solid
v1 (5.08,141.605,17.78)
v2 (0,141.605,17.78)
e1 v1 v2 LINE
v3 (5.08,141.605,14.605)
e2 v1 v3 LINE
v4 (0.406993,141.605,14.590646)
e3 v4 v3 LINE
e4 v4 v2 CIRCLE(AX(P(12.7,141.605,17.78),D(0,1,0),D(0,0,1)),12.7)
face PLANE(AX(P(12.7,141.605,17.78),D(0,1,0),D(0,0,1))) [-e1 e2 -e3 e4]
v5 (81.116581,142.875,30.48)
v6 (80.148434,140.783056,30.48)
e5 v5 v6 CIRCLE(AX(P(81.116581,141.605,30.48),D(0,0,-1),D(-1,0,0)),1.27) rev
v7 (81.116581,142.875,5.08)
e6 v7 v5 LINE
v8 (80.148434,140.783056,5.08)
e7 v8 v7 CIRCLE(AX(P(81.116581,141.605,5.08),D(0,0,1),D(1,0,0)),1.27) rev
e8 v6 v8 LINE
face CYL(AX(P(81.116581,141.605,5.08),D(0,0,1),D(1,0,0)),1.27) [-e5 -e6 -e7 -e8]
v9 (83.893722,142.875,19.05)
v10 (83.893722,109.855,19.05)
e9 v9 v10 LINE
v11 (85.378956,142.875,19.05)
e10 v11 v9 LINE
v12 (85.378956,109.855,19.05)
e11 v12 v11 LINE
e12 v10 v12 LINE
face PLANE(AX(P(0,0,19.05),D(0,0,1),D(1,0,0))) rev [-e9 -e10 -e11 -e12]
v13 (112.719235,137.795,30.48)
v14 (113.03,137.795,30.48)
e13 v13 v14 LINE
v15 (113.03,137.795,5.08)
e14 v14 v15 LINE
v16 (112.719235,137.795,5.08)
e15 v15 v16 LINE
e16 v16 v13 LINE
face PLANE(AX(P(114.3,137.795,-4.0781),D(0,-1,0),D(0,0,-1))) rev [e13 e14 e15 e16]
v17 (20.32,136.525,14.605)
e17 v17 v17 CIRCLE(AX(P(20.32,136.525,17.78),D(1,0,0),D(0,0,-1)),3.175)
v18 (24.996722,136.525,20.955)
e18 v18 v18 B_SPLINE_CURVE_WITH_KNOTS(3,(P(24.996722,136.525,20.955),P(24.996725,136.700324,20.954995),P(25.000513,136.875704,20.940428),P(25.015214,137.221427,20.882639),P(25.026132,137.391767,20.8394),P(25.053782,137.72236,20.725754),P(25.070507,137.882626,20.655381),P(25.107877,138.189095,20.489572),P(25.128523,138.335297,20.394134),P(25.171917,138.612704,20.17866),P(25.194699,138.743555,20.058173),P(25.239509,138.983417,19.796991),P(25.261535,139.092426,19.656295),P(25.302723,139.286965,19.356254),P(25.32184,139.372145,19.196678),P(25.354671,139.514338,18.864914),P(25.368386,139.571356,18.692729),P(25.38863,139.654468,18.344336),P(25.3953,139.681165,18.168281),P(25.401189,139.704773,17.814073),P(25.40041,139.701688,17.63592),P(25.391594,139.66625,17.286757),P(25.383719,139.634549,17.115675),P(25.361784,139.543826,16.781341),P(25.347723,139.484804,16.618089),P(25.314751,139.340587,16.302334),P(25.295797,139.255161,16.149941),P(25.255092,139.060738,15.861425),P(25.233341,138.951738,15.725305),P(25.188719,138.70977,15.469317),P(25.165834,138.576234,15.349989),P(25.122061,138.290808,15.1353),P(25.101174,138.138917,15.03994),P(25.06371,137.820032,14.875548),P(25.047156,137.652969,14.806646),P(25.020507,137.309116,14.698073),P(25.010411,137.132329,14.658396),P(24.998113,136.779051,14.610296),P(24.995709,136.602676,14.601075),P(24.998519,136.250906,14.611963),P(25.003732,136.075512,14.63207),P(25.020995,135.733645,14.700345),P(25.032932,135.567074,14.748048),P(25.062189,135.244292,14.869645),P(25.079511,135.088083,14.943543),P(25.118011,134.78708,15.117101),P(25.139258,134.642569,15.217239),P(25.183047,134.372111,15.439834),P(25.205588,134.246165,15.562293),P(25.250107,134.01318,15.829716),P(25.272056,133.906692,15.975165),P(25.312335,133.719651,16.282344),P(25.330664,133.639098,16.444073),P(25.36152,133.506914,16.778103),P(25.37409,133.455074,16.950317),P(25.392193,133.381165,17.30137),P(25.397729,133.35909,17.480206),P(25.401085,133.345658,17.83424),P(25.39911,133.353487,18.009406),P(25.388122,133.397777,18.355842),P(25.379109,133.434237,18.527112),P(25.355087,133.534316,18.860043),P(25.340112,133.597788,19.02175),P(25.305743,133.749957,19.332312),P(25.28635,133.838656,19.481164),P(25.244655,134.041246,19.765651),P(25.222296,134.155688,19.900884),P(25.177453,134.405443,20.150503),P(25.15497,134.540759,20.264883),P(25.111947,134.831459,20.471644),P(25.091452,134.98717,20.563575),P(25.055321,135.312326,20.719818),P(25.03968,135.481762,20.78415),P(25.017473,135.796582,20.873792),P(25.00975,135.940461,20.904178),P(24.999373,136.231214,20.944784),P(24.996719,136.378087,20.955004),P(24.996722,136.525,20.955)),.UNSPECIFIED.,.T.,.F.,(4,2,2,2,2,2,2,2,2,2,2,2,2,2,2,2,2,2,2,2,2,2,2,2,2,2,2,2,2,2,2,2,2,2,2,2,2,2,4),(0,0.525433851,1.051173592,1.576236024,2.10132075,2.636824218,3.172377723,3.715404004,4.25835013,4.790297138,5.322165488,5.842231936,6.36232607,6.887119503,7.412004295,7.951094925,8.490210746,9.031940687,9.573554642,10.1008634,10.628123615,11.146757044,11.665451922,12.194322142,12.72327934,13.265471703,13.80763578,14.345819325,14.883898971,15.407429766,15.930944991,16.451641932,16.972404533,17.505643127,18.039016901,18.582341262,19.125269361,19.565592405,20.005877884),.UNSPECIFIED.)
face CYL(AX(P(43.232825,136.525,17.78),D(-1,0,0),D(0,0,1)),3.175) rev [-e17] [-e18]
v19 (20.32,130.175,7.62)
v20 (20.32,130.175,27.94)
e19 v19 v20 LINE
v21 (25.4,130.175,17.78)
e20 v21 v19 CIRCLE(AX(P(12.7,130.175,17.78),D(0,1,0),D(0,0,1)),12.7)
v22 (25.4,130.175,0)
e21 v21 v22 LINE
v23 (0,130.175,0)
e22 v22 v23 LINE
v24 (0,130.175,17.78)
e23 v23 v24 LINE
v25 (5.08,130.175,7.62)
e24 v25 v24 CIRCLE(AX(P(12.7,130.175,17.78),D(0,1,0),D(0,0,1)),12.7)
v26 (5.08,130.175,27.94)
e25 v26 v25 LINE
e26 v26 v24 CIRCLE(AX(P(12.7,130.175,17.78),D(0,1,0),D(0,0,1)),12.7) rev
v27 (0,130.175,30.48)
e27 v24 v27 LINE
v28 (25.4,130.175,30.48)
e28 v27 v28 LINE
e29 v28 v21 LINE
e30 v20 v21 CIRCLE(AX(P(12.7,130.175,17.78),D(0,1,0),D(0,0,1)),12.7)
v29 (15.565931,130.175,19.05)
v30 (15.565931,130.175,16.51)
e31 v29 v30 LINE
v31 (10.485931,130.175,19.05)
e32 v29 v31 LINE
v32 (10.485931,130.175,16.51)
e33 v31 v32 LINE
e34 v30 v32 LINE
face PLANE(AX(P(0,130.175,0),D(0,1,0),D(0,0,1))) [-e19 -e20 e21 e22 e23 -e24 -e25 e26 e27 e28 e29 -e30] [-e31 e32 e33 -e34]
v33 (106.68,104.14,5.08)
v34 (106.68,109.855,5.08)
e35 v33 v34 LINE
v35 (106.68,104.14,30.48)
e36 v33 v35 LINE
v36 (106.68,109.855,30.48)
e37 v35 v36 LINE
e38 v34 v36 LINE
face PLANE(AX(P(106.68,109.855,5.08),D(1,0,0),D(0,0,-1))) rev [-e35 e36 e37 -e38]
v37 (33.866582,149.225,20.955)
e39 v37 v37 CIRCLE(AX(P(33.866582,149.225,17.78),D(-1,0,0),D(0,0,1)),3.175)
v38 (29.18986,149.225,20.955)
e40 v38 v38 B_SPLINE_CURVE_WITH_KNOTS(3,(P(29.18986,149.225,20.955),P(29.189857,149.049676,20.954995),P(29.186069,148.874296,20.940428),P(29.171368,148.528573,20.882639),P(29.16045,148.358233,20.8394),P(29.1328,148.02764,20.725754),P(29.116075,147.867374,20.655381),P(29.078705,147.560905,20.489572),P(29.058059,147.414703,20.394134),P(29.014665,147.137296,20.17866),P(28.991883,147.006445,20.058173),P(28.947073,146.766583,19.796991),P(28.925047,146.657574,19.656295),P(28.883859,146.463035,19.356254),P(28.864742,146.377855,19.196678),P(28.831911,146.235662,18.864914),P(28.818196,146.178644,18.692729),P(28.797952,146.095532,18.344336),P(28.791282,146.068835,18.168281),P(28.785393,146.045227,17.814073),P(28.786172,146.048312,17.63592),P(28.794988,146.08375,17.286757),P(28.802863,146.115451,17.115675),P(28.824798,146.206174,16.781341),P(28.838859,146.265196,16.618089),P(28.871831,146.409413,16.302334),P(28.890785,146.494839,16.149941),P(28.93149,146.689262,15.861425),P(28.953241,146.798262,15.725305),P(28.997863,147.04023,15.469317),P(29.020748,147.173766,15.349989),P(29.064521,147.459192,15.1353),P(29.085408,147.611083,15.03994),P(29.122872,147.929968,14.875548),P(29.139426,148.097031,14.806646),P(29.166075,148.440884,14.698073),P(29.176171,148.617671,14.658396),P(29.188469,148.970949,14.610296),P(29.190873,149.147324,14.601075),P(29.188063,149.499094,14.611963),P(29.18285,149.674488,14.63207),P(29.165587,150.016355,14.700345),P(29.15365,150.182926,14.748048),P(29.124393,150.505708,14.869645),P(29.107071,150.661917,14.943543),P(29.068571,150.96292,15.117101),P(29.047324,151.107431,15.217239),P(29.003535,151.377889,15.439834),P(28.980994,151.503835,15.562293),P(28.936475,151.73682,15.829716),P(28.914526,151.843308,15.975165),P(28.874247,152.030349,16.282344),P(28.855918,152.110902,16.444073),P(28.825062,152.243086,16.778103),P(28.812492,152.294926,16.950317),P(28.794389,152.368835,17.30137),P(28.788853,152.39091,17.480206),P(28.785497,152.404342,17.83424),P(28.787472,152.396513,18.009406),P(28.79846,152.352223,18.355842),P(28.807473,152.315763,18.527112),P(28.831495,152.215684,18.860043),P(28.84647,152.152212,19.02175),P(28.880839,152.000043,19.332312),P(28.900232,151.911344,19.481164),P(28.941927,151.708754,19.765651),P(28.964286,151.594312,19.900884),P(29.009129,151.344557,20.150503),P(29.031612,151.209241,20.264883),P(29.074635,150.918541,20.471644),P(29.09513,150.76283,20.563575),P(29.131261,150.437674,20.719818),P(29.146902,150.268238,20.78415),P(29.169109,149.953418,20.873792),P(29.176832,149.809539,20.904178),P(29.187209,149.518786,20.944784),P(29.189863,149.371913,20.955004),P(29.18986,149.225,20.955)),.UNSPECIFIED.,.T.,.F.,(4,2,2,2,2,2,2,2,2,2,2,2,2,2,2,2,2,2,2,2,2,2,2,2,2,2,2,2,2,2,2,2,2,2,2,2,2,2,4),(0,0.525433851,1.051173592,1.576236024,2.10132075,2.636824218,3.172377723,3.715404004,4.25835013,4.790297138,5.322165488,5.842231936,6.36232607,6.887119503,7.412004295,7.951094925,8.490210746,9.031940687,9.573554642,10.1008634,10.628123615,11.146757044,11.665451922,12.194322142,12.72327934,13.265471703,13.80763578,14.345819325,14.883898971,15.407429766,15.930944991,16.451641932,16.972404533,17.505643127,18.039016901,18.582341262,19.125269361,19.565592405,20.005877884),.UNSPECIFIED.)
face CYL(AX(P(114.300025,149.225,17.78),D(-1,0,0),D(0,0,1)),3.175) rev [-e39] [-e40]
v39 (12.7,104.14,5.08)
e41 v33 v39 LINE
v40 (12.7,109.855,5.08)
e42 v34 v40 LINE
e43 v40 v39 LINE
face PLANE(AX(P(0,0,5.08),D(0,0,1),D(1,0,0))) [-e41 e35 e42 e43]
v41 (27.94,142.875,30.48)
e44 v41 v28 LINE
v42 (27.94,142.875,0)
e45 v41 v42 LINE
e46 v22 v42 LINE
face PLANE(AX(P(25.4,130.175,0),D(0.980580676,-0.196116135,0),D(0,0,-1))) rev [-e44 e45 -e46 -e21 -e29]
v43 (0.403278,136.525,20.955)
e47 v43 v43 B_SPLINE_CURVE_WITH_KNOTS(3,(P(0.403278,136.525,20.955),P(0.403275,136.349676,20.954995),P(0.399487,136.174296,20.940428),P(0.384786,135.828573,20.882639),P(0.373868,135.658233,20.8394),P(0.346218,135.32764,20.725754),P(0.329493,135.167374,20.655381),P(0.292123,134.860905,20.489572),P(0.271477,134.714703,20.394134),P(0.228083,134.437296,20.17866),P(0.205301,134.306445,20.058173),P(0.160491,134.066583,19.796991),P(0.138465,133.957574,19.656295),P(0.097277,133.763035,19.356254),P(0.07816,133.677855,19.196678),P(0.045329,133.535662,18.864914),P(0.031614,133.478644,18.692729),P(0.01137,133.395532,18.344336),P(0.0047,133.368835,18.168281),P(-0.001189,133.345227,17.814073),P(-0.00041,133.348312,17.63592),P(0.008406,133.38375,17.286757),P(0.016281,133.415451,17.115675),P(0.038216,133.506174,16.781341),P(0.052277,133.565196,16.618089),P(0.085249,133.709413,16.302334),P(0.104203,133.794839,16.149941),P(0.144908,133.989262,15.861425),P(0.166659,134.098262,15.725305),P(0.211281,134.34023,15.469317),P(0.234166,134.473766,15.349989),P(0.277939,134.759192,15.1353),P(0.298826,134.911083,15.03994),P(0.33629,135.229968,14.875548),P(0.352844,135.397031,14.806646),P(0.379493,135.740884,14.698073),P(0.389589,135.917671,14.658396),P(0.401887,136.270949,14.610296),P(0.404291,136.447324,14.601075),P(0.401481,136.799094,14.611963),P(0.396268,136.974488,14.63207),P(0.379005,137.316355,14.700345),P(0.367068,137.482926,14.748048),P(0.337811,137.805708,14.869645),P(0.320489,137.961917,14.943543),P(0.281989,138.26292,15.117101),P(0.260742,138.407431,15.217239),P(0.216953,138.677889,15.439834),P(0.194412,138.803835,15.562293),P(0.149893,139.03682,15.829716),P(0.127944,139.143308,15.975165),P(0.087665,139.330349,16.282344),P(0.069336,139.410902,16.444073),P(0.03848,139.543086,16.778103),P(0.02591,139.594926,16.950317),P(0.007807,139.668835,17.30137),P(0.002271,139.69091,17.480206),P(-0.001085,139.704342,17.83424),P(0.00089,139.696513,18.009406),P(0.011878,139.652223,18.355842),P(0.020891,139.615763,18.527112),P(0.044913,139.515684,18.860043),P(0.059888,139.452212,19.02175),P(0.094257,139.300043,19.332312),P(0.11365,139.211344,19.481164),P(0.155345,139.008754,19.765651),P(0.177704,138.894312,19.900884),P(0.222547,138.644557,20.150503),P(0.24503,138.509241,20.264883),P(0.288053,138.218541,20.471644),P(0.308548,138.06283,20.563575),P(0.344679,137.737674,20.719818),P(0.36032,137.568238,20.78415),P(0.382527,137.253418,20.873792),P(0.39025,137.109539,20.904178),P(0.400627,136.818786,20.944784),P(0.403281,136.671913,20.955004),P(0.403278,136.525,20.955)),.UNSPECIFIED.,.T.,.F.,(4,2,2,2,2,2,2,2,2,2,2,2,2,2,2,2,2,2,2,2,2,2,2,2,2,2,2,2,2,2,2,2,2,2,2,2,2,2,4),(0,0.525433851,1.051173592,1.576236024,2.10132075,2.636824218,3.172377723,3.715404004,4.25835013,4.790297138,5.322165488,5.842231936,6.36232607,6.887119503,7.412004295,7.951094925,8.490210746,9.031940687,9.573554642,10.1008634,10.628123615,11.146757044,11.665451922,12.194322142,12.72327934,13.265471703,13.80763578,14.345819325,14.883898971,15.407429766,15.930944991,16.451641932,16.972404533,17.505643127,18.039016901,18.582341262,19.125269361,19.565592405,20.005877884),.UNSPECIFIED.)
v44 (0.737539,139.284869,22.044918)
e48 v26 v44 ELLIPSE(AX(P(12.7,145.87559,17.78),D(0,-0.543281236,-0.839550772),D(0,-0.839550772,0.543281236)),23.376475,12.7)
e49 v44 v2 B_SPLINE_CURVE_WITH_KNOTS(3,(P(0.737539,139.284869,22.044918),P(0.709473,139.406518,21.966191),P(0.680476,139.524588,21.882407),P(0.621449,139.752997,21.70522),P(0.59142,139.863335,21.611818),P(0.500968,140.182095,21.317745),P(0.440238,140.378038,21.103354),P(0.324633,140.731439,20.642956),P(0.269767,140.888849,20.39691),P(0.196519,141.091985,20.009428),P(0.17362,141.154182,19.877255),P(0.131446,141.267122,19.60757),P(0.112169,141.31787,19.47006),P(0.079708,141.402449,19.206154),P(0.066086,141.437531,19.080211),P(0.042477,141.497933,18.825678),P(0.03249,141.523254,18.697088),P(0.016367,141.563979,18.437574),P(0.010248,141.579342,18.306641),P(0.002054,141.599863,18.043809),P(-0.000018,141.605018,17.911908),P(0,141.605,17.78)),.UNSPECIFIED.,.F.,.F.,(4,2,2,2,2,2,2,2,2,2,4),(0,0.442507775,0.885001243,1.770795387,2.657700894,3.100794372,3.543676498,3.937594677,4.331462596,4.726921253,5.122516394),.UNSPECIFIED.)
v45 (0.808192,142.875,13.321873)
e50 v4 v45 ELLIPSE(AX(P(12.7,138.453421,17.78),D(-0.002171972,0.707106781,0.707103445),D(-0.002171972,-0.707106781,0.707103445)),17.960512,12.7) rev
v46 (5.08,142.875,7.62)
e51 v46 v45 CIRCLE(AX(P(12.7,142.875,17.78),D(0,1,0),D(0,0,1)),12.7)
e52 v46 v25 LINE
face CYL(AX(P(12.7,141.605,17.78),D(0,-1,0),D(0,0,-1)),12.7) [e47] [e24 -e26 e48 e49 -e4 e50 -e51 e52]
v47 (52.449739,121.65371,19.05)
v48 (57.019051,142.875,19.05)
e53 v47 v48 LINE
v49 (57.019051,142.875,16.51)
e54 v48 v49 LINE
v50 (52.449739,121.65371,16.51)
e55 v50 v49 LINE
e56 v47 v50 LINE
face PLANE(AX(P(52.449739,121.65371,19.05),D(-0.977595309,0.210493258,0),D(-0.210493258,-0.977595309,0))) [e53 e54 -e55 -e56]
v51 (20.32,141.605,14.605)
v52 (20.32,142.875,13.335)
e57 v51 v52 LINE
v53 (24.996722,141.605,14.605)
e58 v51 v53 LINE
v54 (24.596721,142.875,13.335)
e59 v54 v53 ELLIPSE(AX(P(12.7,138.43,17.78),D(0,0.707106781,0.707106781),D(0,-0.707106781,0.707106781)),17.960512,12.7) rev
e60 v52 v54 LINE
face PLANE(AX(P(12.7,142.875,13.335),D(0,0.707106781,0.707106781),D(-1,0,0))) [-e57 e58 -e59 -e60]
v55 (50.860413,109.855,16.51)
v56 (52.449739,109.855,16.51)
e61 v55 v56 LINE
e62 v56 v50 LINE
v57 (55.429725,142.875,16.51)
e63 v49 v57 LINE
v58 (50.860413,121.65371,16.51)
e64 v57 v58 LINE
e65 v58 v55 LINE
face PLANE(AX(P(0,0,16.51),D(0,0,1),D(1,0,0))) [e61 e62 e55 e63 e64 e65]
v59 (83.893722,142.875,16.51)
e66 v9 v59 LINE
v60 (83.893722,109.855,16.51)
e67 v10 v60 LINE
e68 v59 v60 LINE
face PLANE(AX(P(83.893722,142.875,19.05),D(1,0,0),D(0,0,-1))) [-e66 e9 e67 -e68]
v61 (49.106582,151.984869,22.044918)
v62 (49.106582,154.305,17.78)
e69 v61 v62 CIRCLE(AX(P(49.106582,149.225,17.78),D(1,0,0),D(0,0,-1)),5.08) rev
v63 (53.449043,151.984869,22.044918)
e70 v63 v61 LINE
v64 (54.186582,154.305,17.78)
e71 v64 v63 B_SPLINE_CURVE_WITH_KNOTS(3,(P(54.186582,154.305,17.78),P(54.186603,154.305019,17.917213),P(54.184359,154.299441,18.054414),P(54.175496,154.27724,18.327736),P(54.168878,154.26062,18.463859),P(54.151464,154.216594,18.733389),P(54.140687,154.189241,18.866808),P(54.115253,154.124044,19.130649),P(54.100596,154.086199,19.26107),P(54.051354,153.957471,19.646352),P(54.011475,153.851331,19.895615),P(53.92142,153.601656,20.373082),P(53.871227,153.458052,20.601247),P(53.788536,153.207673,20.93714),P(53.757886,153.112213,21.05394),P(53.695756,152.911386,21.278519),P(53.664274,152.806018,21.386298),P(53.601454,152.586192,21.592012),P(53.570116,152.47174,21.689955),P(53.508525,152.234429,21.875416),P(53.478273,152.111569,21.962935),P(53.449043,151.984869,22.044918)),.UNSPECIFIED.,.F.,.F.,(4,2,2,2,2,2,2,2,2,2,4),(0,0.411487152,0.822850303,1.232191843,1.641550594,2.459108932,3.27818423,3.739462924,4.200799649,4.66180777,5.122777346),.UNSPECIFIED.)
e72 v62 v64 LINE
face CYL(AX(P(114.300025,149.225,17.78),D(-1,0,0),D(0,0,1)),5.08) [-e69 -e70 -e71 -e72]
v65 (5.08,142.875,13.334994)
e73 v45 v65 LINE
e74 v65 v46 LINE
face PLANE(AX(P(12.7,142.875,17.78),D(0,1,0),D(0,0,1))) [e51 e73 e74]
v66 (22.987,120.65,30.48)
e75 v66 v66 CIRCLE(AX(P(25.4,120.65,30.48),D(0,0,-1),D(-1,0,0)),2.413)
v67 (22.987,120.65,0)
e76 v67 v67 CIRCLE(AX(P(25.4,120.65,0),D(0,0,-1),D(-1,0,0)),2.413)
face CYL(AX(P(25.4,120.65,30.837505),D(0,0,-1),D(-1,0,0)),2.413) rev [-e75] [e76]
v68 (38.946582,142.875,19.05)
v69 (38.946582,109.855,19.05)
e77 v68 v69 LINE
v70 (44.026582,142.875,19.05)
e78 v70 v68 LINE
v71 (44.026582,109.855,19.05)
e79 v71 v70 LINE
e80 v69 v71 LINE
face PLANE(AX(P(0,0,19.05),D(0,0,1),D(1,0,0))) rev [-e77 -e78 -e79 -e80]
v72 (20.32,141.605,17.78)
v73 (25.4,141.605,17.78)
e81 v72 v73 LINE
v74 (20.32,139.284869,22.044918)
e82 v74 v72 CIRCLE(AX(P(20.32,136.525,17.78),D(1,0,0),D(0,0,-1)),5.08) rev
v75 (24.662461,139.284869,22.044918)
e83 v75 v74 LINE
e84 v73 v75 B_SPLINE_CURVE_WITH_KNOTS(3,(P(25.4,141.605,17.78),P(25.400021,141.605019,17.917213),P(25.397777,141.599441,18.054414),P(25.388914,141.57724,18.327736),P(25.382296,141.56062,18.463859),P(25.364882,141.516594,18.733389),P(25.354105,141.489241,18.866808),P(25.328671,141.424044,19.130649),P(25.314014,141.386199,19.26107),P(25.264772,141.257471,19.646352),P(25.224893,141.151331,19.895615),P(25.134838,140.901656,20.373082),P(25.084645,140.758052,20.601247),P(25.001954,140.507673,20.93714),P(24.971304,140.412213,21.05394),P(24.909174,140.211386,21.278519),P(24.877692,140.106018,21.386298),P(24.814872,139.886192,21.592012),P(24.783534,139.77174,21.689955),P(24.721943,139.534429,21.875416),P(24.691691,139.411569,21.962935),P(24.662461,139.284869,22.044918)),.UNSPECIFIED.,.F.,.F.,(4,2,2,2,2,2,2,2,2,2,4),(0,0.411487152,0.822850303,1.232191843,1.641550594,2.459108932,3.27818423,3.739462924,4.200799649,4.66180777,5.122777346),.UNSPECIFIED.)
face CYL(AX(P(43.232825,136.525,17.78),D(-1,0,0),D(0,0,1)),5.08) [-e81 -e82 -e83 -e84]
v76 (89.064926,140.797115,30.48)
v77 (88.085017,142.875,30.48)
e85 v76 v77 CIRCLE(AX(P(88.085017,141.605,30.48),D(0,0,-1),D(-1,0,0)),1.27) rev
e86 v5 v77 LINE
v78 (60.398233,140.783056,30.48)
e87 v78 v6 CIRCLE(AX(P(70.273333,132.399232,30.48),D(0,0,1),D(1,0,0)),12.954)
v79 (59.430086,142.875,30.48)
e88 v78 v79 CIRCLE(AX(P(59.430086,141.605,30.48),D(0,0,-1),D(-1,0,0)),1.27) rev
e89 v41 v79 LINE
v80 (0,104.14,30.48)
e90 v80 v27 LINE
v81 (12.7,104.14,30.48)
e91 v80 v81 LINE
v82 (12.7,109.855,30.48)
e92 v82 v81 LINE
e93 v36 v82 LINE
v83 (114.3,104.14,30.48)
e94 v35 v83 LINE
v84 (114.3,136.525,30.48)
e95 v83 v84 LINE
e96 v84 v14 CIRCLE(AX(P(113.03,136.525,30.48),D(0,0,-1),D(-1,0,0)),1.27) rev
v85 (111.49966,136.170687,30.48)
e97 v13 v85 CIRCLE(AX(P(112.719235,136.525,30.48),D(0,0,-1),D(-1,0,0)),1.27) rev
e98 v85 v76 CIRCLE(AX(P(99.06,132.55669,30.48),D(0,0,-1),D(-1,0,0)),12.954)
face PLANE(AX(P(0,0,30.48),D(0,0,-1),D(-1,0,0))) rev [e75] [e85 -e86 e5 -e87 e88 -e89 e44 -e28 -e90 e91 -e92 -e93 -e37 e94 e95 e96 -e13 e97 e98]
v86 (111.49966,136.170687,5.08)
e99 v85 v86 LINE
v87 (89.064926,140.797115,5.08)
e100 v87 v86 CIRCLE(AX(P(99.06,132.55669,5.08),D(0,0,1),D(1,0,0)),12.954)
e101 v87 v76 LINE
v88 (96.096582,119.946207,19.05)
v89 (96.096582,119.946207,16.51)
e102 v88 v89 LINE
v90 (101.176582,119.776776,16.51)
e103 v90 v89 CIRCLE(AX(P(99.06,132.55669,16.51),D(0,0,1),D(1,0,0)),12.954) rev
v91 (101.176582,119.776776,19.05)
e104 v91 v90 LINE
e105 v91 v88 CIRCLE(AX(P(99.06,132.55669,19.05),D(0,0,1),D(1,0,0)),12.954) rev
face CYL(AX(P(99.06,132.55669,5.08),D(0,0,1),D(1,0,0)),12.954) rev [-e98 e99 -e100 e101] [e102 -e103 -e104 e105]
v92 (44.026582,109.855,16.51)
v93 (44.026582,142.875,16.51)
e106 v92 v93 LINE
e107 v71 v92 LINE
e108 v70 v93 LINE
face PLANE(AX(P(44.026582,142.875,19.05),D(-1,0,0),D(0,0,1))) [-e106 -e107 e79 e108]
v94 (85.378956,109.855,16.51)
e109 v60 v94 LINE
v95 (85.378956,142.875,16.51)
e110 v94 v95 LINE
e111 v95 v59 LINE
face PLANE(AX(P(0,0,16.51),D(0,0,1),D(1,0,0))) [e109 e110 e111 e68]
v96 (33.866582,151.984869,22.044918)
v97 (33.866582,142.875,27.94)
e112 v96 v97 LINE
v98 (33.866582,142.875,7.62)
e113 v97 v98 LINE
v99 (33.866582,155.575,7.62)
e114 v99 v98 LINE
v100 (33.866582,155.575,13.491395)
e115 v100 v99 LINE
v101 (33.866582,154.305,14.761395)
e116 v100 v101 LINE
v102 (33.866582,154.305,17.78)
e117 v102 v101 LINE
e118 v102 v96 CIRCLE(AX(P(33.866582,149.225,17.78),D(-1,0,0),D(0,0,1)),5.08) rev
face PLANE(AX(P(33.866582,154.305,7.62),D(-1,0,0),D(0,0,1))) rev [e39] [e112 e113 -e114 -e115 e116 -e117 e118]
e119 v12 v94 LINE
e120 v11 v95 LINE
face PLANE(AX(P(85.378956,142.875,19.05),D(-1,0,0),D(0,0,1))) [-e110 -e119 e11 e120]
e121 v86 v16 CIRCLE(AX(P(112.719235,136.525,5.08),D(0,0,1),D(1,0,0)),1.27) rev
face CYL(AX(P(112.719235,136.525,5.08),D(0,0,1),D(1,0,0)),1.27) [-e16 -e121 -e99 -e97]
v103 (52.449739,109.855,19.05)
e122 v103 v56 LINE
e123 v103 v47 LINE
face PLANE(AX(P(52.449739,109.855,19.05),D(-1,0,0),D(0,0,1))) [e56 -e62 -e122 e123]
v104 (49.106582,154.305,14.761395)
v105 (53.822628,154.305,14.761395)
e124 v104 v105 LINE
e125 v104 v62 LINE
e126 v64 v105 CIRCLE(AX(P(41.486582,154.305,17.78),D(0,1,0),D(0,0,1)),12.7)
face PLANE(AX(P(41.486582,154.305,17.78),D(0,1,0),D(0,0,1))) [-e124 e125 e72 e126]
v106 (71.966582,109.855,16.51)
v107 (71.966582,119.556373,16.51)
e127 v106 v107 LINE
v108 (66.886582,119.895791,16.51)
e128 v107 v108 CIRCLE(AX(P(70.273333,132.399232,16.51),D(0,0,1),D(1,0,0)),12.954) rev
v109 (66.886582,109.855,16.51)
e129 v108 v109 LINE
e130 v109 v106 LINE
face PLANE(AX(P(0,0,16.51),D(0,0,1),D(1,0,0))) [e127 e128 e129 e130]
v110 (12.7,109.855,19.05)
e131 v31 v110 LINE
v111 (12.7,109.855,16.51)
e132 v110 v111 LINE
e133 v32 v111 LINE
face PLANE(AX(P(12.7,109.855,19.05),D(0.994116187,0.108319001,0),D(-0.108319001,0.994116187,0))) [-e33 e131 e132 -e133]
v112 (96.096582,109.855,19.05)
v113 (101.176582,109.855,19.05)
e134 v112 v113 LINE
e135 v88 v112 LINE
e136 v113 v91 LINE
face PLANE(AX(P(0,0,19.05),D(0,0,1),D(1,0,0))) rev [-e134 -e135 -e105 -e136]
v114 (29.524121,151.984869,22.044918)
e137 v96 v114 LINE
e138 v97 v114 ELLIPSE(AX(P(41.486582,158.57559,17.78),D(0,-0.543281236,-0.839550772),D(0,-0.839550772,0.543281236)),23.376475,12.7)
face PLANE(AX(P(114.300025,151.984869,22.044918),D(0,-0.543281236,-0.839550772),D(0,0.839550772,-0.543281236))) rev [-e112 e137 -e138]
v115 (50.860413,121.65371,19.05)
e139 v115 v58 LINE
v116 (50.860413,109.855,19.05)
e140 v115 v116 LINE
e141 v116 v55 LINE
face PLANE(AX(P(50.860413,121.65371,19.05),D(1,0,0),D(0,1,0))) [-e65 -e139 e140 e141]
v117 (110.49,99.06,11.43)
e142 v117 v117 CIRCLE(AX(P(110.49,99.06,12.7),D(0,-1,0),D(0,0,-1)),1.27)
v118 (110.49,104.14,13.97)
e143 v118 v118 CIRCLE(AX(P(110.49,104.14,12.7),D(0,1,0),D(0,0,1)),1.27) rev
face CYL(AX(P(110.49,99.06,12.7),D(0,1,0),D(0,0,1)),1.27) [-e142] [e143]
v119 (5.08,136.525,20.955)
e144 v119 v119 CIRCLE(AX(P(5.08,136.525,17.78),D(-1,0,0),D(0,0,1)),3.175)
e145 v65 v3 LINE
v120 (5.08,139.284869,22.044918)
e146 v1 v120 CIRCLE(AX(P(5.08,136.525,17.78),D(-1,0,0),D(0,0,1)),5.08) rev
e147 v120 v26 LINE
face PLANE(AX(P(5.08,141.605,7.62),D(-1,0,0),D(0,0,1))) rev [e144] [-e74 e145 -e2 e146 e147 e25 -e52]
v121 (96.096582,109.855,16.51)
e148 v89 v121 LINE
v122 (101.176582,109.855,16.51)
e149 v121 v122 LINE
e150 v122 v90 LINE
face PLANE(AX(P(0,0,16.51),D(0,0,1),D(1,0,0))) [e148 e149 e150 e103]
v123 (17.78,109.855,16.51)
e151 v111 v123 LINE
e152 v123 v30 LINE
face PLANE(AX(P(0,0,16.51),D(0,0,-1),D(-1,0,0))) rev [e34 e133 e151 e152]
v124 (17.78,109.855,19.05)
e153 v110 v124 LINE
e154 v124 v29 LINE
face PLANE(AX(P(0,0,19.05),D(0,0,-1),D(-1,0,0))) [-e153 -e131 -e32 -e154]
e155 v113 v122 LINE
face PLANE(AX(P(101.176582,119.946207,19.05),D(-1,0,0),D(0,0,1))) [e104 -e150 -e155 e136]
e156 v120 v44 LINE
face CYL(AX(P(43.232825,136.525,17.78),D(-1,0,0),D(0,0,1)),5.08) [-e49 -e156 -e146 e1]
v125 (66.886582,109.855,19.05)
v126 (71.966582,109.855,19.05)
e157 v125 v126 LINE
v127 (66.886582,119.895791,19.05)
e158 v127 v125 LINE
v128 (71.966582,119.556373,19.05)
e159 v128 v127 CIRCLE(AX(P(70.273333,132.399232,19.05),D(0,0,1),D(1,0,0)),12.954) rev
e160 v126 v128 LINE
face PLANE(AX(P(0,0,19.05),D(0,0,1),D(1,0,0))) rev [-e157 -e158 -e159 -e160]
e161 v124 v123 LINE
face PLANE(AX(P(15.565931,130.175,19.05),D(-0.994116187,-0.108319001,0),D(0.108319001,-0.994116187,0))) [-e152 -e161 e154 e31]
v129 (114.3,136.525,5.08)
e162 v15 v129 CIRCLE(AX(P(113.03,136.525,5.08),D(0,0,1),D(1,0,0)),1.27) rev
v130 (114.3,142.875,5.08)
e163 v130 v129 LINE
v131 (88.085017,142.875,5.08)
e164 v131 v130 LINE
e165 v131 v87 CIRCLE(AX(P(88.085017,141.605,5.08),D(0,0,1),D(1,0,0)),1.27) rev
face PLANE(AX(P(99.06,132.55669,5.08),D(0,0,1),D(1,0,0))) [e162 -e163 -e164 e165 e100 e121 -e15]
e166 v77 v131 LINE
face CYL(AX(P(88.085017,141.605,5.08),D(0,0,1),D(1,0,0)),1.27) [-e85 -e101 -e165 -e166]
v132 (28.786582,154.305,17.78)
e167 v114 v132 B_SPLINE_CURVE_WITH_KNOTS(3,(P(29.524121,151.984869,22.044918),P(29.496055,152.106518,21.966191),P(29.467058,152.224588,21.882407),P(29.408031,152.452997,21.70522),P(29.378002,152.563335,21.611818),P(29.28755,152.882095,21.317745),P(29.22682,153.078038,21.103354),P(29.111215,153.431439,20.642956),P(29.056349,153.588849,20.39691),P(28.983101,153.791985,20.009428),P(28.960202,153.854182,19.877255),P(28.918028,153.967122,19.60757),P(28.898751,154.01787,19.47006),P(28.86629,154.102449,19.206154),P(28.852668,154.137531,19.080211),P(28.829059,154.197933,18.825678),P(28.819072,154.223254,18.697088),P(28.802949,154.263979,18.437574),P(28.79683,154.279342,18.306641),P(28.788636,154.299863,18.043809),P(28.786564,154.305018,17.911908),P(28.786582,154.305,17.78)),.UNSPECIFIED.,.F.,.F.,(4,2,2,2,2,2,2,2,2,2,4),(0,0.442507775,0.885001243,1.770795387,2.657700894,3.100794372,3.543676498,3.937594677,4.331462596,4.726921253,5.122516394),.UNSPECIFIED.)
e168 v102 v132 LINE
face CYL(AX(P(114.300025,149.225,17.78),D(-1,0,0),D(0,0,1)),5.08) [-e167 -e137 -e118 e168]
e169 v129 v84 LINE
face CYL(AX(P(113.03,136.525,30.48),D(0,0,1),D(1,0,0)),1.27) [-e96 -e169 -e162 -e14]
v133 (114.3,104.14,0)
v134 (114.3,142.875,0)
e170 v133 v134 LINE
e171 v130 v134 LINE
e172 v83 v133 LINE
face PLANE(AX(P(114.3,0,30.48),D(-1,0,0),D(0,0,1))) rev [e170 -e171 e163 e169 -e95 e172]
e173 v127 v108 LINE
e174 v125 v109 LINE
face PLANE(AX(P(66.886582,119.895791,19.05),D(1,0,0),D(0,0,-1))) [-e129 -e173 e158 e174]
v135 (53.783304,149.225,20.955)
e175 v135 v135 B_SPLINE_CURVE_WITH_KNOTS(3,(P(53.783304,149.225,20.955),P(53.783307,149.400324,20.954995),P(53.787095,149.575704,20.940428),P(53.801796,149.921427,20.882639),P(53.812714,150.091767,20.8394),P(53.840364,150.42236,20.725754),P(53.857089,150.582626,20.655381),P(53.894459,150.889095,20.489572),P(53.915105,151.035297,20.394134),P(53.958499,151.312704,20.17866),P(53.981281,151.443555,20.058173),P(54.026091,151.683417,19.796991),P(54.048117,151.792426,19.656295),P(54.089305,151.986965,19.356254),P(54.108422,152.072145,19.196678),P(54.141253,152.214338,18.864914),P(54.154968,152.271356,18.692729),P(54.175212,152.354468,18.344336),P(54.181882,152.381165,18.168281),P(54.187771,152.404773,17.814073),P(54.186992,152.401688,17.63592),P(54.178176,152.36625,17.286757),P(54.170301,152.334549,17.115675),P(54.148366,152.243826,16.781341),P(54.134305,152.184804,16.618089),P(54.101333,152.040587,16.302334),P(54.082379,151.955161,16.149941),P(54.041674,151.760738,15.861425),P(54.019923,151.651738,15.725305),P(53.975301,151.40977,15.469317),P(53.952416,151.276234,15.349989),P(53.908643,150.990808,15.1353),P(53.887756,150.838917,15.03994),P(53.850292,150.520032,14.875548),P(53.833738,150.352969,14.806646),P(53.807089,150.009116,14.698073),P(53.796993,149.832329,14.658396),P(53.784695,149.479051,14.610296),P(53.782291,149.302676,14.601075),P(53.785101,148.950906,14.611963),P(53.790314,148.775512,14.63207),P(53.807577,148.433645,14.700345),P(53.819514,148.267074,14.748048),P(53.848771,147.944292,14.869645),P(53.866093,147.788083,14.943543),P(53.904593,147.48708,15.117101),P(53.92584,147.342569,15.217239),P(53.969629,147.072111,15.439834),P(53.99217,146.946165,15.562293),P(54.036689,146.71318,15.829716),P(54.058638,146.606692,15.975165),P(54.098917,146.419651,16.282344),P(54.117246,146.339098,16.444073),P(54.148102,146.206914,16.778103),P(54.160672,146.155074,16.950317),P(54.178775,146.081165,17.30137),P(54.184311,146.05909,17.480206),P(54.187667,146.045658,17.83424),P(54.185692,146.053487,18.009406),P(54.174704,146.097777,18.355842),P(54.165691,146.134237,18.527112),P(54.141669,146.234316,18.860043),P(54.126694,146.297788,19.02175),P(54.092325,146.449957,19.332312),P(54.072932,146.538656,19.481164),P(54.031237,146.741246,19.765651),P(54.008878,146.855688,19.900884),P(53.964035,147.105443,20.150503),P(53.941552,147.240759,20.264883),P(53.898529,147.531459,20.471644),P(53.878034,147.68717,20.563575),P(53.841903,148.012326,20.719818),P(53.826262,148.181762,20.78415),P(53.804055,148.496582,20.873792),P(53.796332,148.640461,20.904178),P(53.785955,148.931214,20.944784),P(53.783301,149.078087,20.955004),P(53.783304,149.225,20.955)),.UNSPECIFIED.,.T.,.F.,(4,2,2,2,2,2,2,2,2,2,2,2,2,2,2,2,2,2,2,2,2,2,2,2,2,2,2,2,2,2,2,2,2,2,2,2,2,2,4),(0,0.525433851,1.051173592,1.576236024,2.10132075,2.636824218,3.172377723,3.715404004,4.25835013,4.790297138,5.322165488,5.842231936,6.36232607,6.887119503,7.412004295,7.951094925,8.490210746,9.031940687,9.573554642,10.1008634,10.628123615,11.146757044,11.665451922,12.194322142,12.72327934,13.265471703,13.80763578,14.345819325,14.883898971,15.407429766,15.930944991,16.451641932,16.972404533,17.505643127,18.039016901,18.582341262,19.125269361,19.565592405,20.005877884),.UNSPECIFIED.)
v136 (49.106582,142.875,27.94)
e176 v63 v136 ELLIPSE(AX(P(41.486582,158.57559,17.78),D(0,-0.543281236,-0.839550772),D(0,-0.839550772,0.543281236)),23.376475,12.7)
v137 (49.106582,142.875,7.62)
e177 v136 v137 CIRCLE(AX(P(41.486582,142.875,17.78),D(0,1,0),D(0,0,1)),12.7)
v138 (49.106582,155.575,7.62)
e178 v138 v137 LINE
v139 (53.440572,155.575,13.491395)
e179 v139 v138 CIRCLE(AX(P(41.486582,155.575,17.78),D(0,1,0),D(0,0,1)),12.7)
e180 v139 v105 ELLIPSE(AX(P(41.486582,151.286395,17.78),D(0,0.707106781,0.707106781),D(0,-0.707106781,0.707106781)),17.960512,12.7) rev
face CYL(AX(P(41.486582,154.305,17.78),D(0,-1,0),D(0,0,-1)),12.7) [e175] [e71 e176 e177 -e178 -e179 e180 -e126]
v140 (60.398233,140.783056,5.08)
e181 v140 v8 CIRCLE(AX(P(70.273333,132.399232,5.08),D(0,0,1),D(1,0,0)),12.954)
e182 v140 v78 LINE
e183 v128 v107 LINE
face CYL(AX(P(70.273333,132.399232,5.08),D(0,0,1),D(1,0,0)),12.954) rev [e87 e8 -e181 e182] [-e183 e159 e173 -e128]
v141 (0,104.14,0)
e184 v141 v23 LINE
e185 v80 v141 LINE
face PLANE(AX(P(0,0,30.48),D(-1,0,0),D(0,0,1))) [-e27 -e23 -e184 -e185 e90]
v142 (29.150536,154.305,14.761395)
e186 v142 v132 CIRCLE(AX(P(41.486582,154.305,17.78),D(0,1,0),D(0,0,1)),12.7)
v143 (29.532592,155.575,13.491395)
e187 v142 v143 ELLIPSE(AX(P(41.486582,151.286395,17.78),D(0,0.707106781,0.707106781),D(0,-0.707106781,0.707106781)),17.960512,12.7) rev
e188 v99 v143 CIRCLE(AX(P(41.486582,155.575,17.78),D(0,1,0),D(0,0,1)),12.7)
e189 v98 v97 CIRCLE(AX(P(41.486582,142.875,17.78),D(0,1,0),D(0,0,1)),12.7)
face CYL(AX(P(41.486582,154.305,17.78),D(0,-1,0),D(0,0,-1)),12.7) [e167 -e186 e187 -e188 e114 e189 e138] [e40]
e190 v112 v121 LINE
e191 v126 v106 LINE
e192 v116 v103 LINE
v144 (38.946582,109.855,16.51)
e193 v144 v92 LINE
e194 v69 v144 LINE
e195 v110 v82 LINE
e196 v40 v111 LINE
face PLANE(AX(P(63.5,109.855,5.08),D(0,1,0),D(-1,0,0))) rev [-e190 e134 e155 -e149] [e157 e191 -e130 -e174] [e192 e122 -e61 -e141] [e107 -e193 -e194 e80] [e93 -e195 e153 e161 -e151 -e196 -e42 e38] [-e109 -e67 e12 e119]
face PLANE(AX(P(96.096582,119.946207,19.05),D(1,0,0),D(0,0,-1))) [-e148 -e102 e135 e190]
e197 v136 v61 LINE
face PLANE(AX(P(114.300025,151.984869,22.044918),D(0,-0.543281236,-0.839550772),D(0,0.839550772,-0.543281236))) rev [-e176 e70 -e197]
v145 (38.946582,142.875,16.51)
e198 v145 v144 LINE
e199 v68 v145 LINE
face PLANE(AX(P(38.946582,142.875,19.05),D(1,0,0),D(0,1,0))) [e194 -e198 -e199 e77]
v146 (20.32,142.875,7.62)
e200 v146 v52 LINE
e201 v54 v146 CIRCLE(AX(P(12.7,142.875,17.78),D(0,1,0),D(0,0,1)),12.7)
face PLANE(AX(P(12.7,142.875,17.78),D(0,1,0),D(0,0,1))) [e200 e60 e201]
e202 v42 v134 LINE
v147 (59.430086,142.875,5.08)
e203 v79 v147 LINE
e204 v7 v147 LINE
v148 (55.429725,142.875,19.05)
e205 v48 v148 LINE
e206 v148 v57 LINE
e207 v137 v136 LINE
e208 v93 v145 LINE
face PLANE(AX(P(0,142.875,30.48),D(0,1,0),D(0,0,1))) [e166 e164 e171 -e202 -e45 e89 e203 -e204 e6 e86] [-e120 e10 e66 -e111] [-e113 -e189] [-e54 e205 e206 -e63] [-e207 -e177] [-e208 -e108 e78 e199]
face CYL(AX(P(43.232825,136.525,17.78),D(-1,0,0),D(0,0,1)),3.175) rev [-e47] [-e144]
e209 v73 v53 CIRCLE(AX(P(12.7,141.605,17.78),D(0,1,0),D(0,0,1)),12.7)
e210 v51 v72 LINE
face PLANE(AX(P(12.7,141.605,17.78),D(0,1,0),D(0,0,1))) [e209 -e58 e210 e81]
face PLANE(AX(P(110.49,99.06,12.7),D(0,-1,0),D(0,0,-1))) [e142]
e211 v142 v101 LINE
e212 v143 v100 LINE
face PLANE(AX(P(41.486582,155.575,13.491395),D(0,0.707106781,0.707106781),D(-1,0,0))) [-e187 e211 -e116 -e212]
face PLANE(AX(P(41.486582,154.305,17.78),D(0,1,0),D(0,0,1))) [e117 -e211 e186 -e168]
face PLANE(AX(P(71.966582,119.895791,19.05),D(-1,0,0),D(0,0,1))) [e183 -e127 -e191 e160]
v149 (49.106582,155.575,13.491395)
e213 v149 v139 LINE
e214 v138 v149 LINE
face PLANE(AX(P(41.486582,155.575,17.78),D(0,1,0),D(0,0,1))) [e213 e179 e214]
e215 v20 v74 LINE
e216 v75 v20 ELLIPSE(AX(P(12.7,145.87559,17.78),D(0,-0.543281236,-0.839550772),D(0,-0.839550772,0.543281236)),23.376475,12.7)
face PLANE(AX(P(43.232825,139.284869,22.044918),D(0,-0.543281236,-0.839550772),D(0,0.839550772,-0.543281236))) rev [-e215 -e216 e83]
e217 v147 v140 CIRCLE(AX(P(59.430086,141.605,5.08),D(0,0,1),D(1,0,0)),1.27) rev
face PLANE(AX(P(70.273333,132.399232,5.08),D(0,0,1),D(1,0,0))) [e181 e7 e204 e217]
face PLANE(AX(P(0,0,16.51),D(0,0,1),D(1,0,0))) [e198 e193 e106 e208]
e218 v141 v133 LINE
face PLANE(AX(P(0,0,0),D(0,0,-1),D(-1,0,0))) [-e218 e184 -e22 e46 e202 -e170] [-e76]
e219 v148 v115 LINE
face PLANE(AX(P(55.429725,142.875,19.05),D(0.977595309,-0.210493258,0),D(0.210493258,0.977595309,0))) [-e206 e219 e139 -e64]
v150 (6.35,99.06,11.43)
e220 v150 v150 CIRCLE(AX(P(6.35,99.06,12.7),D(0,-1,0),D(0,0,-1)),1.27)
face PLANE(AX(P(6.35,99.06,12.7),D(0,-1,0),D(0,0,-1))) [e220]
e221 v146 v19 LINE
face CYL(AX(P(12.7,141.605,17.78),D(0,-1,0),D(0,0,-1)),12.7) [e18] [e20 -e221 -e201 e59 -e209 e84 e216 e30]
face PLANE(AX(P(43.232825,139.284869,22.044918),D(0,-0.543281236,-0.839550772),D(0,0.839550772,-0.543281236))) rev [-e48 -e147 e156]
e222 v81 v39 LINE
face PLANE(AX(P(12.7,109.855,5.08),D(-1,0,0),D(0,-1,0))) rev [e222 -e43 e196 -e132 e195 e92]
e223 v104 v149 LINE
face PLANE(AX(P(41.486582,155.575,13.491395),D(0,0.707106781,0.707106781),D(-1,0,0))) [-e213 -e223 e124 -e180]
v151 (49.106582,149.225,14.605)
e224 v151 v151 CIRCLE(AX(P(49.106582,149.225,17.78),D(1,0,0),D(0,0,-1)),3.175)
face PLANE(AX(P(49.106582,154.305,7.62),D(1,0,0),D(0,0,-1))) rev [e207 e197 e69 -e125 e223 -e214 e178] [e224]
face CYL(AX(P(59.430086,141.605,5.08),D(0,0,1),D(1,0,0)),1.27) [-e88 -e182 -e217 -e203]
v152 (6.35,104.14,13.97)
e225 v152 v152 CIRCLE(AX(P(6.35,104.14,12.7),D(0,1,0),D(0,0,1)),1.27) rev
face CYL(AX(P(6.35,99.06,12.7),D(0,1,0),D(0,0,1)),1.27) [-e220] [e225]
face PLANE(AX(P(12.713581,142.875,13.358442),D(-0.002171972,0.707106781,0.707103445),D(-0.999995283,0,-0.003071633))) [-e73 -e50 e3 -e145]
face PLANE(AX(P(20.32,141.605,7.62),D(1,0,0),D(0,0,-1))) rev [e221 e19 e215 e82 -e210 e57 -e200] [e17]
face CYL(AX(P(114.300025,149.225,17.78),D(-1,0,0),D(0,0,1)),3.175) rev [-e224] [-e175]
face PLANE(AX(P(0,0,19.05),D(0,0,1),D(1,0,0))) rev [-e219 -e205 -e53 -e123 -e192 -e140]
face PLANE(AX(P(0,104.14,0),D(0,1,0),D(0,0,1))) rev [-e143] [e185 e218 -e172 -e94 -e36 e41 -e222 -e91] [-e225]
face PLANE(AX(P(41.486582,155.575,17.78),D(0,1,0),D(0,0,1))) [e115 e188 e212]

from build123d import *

# Parameters (mm, degrees)
SKETCH2_W                      = 114.3
SKETCH2_H                      = 142.875
BOSS_EXTRUDE2_DEPTH            = 30.48
FILLET1_SIZE                   = 25.4
FILLET1_SIZE_2                 = 71.501
BOSS_EXTRUDE3_DEPTH            = 11.43
CUT_EXTRUDE2_DEPTH             = 25.4
FILLET2_R                      = 1.27
SKETCH7_W                      = 27.94
SKETCH7_H                      = 30.48
CUT_EXTRUDE4_DEPTH             = 12.7
BOSS_EXTRUDE4_DEPTH            = 11.43
CUT_EXTRUDE6_DEPTH             = 25.4
CUT_EXTRUDE7_DEPTH             = 171.262283535
CUT_EXTRUDE7_DEPTH_BACK        = 171.262283535
SKETCH11_R                     = 3.175
CUT_EXTRUDE8_REACH             = 185.225
SKETCH12_R                     = 3.175
CUT_EXTRUDE8_DIRECTION_2_DEPTH = 184.224735996
CHAMFER1_SIZE2                 = 12.7
CHAMFER1_SIZE                  = 2.54
SKETCH13_W                     = 7.62
SKETCH13_H                     = 5.08
CUT_EXTRUDE9_DEPTH             = 25.4
FILLET4_R                      = 1.27
CUT_EXTRUDE10_DEPTH            = 195.431359314
CHAMFER2_SIZE                  = 12.7
CUT_EXTRUDE11_REACH            = 196.431
SKETCH15_R                     = 3.175
BOSS_EXTRUDE5_DEPTH            = 1.27
CHAMFER3_SIZE                  = 1.27
BOSS_EXTRUDE6_DEPTH            = 1.27
CHAMFER4_SIZE                  = 1.27
FILLET5_R                      = 15.24
CUT_EXTRUDE12_DEPTH            = 16.51
SKETCH20_W                     = 2.54
SKETCH20_H                     = 2.54
CUT_EXTRUDE13_DEPTH            = 171.777226453
FILLET6_R                      = 1.27
CUT_EXTRUDE14_DEPTH            = 1.27
CUT_EXTRUDE14_DEPTH_BACK       = 1.27
SKETCH21_W                     = 5.08
SKETCH21_H                     = 33.02
SKETCH21_H_2                   = 10.040791179
SKETCH21_H_3                   = 10.09120709
SKETCH21_W_2                   = 7.62
SKETCH21_H_4                   = 1.402013576
SKETCH21_W_3                   = 1.485233779
FILLET7_R                      = 11.43
SKETCH22_R                     = 1.27
CUT_EXTRUDE15_DEPTH            = 12.7
CUT_EXTRUDE16_DEPTH            = 196.440786647
CUT_EXTRUDE16_DEPTH_BACK       = 196.440786647
SKETCH23_R                     = 2.413
SKETCH24_W                     = 12.7
SKETCH24_H                     = 30.48
BOSS_EXTRUDE7_DEPTH            = 25.4
SKETCH25_R                     = 2.54
CUT_EXTRUDE17_DEPTH            = 178.14615249
CUT_EXTRUDE18_DEPTH            = 104.14
CUT_EXTRUDE18_DEPTH_BACK       = 43.18
SKETCH27_W                     = 143.457929344
SKETCH27_H                     = 100.176079989
SKETCH28_R                     = 1.27
BOSS_EXTRUDE8_DEPTH            = 5.08


# Some blends are built 0.0001 mm under size
with BuildPart() as part:
    # Sketch2 → Boss-Extrude2 (new body)
    with BuildSketch(Plane.XY):
        with Locations((57.15, 71.4375)):
            Rectangle(SKETCH2_W, SKETCH2_H)
    extrude(amount=BOSS_EXTRUDE2_DEPTH)

    # Fillet1
    # an asymmetric fillet: 71.501, 25.4 mm, written as the material it takes off along each edge
    with BuildSketch(Plane(origin=(0, 0, -178.7525), x_dir=(1, 0, 0), z_dir=(0, 0, 1))) as fillet1_piece_1:
        with BuildLine():
            Bezier((FILLET1_SIZE, 0), (0, 0), (0, FILLET1_SIZE_2), weights=[1, 0.707106781, 1])
            Line((0, FILLET1_SIZE_2), (0, 0))
            Line((0, 0), (FILLET1_SIZE, 0))
        make_face()
    extrude(amount=387.985, mode=Mode.SUBTRACT)

    # Sketch3 → Boss-Extrude3 (add)
    with BuildSketch(Plane(origin=(0, 142.875, 0), x_dir=(1, 0, 0), z_dir=(0, 1, 0))):
        with BuildLine():
            Line((33.866582, -7.62), (33.866582, -27.94))
            ThreePointArc((33.866582, -27.94), (28.786582, -17.78), (33.866582, -7.62))
        make_face()
        with BuildLine():
            Line((49.106582, -7.62), (49.106582, -27.94))
            ThreePointArc((49.106582, -27.94), (54.186582, -17.78), (49.106582, -7.62))
        make_face()
    extrude(amount=BOSS_EXTRUDE3_DEPTH)

    # Sketch5 → Cut-Extrude2 (cut)
    with BuildSketch(Plane.XY.offset(30.48)):
        with BuildLine():
            Line((62.653333333, 142.875), (77.893333333, 142.875))
            ThreePointArc((77.893333333, 142.875), (70.273333333, 119.445231961), (62.653333333, 142.875))
        make_face()
        with BuildLine():
            Line((91.44, 143.032457663), (106.68, 143.032457663))
            ThreePointArc((106.68, 143.032457663), (99.06, 119.602689625), (91.44, 143.032457663))
        make_face()
    extrude(amount=-CUT_EXTRUDE2_DEPTH, mode=Mode.SUBTRACT)

    # Fillet2
    fillet2_edges = [part.edges().sort_by_distance(p)[0] for p in [
        (77.893333333, 142.875, 17.78),
        (62.653333333, 142.875, 17.78),
        (91.228104508, 142.875, 17.78),
    ]]
    fillet(fillet2_edges, radius=FILLET2_R)

    # Sketch7 → Cut-Extrude4 (cut)
    with BuildSketch(Plane(origin=(0, 142.875, 0), x_dir=(1, 0, 0), z_dir=(0, 1, 0))):
        with Locations((13.97, -15.24)):
            Rectangle(SKETCH7_W, SKETCH7_H)
    extrude(amount=-CUT_EXTRUDE4_DEPTH, mode=Mode.SUBTRACT)

    # Sketch8 → Boss-Extrude4 (add)
    with BuildSketch(Plane(origin=(0, 130.175, 0), x_dir=(1, 0, 0), z_dir=(0, 1, 0))):
        with BuildLine():
            Line((5.08, -7.62), (5.08, -27.94))
            ThreePointArc((5.08, -27.94), (0, -17.78), (5.08, -7.62))
        make_face()
        with BuildLine():
            Line((20.32, -7.62), (20.32, -27.94))
            ThreePointArc((20.32, -27.94), (25.4, -17.78), (20.32, -7.62))
        make_face()
    extrude(amount=BOSS_EXTRUDE4_DEPTH)

    # Sketch10 → Cut-Extrude6 (cut)
    with BuildSketch(Plane.XY.offset(30.48)):
        Polygon((63.5, 109.855), (12.7, 109.855), (12.7, 61.2775), (38.1, 12.7), (63.5, 12.7), (63.5, 94.615), (106.68, 94.615), (106.68, 109.855), align=None)
    extrude(amount=-CUT_EXTRUDE6_DEPTH, mode=Mode.SUBTRACT)

    # Sketch11 → Cut-Extrude7 (cut, two sides: drawn at the far end of the back side and taken through both)
    with BuildSketch(Plane.ZY.offset(-49.106582).offset(-CUT_EXTRUDE7_DEPTH_BACK)):
        with Locations((17.78, 149.225)):
            Circle(SKETCH11_R)
        with BuildLine():
            Line((22.044917923, 151.984868677), (27.94, 142.875))
            Line((27.94, 142.875), (27.94, 154.305))
            Line((27.94, 154.305), (17.78, 154.305))
            ThreePointArc((17.78, 154.305), (20.207577715, 153.687428312), (22.044917923, 151.984868677))
        make_face()
    extrude(amount=CUT_EXTRUDE7_DEPTH + CUT_EXTRUDE7_DEPTH_BACK, mode=Mode.SUBTRACT)

    # Cut-Extrude8: up to this face of the body (flat: up to its plane)
    cut_extrude8_end = Plane(part.part.faces().sort_by_distance((27.94, 136.525, 15.24))[0])
    # Sketch12 → Cut-Extrude8 (cut, up to the picked face)
    with BuildSketch(Plane.ZY.offset(-20.32), mode=Mode.PRIVATE) as cut_extrude8_sk1:
        with Locations((17.78, 136.525)):
            Circle(SKETCH12_R)
    cut_extrude8_tool1 = split(extrude(cut_extrude8_sk1.sketch, amount=-CUT_EXTRUDE8_REACH, mode=Mode.PRIVATE), bisect_by=cut_extrude8_end, keep=Keep.BOTH, mode=Mode.PRIVATE)
    # Sketch12 → Cut-Extrude8 (cut, up to the picked face)
    with BuildSketch(Plane.ZY.offset(-20.32), mode=Mode.PRIVATE) as cut_extrude8_sk2:
        with BuildLine():
            Line((22.044917923, 139.284868677), (27.94, 130.175))
            Line((27.94, 130.175), (27.94, 141.605))
            Line((27.94, 141.605), (17.78, 141.605))
            ThreePointArc((17.78, 141.605), (20.207577715, 140.987428312), (22.044917923, 139.284868677))
        make_face()
    cut_extrude8_tool2 = split(extrude(cut_extrude8_sk2.sketch, amount=-CUT_EXTRUDE8_REACH, mode=Mode.PRIVATE), bisect_by=cut_extrude8_end, keep=Keep.BOTH, mode=Mode.PRIVATE)
    add(cut_extrude8_tool1.solids().sort_by(Axis((20.32, 136.525, 17.78), (1, 0, 0)))[0], mode=Mode.SUBTRACT)
    add(cut_extrude8_tool2.solids().sort_by(Axis((20.32, 137.885407, 25.333291), (1, 0, 0)))[0], mode=Mode.SUBTRACT)

    # Sketch12 → Cut-Extrude8 direction 2 (cut)
    with BuildSketch(Plane.ZY.offset(-20.32)):
        with Locations((17.78, 136.525)):
            Circle(SKETCH12_R)
        with BuildLine():
            Line((22.044917923, 139.284868677), (27.94, 130.175))
            Line((27.94, 130.175), (27.94, 141.605))
            Line((27.94, 141.605), (17.78, 141.605))
            ThreePointArc((17.78, 141.605), (20.207577715, 140.987428312), (22.044917923, 139.284868677))
        make_face()
    extrude(amount=CUT_EXTRUDE8_DIRECTION_2_DEPTH, mode=Mode.SUBTRACT)

    # Chamfer1
    chamfer1_edges = [part.edges().sort_by_distance(p)[0] for p in [
        (27.94, 130.175, 15.24),
    ]]
    chamfer1_side = [part.faces().sort_by_distance(p)[0] for p in [
        (27.8892, 130.175, 15.24),
    ]]
    chamfer(chamfer1_edges, length=CHAMFER1_SIZE - 0.0001, length2=CHAMFER1_SIZE2 - 0.0001, reference=chamfer1_side[0])  # a hair under: the kernel refuses the full size

    # Sketch13 → Cut-Extrude9 (cut)
    with BuildSketch(Plane.XY.offset(30.48)):
        with Locations((110.49, 140.335)):
            Rectangle(SKETCH13_W, SKETCH13_H)
    extrude(amount=-CUT_EXTRUDE9_DEPTH, mode=Mode.SUBTRACT)

    # Fillet4
    fillet4_edges = [part.edges().sort_by_distance(p)[0] for p in [
        (110.907625096, 137.795, 17.78),
        (114.3, 137.795, 17.78),
    ]]
    fillet(fillet4_edges, radius=FILLET4_R)

    # Sketch14 → Cut-Extrude10 (cut, through all)
    with BuildSketch(Plane.XY.offset(30.48)):
        Polygon((114.3, 12.7), (81.28, 12.7), (81.28, 26.67), (111.76, 26.67), (111.76, 69.85), (81.28, 69.85), (81.28, 83.82), (114.3, 83.82), align=None)
    extrude(amount=-CUT_EXTRUDE10_DEPTH, mode=Mode.SUBTRACT)

    # Chamfer2
    chamfer2_edges = [part.edges().sort_by_distance(p)[0] for p in [
        (81.28, 76.835, 30.48),
        (81.28, 19.685, 30.48),
    ]]
    chamfer(chamfer2_edges, length=CHAMFER2_SIZE)

    # Cut-Extrude11: up to this face of the body (flat: up to its plane)
    cut_extrude11_end = Plane(part.part.faces().sort_by_distance((59.69, 109.855, 17.78))[0])
    # Sketch15 → Cut-Extrude11 (cut, up to the picked face)
    with BuildSketch(Plane.XZ, mode=Mode.PRIVATE) as cut_extrude11_sk1:
        with Locations(Location((99.06, 17.78, 0), (0, 0, 270))):
            Circle(SKETCH15_R)
    cut_extrude11_tool1 = split(extrude(cut_extrude11_sk1.sketch, amount=-CUT_EXTRUDE11_REACH, mode=Mode.PRIVATE), bisect_by=cut_extrude11_end, keep=Keep.BOTH, mode=Mode.PRIVATE)
    add(cut_extrude11_tool1.solids().sort_by(Axis((99.06, 0, 17.78), (0, 1, 0)))[0], mode=Mode.SUBTRACT)

    # Sketch16 → Boss-Extrude5 (add)
    with BuildSketch(Plane(origin=(0, 141.605, 0), x_dir=(1, 0, 0), z_dir=(0, 1, 0))):
        with BuildLine():
            Line((0.406992957, -14.590646171), (5.08, -14.605))
            Line((5.08, -14.605), (5.08, -7.62))
            ThreePointArc((5.08, -7.62), (2.151092977, -10.708185479), (0.406992957, -14.590646171))
        make_face()
        with BuildLine():
            Line((20.32, -14.605), (24.996722124, -14.605))
            ThreePointArc((24.996722124, -14.605), (23.253033275, -10.714344425), (20.32, -7.62))
            Line((20.32, -7.62), (20.32, -14.605))
        make_face()
    extrude(amount=BOSS_EXTRUDE5_DEPTH)

    # Chamfer3
    chamfer3_edges = [part.edges().sort_by_distance(p)[0] for p in [
        (22.658361062, 142.875, 14.605),
        (2.743496479, 142.875, 14.597823086),
    ]]
    chamfer(chamfer3_edges, length=CHAMFER3_SIZE - 0.0001)  # a hair under: the kernel refuses the full size

    # Sketch17 → Boss-Extrude6 (add)
    with BuildSketch(Plane(origin=(0, 154.305, 0), x_dir=(1, 0, 0), z_dir=(0, 1, 0))):
        with BuildLine():
            Line((29.150536334, -14.761394806), (33.866582, -14.761394806))
            Line((33.866582, -14.761394806), (33.866582, -7.62))
            ThreePointArc((33.866582, -7.62), (30.888902084, -10.781487273), (29.150536334, -14.761394806))
        make_face()
        with BuildLine():
            Line((49.106582, -14.761394806), (53.822627666, -14.761394806))
            ThreePointArc((53.822627666, -14.761394806), (52.084261916, -10.781487273), (49.106582, -7.62))
            Line((49.106582, -7.62), (49.106582, -14.761394806))
        make_face()
    extrude(amount=BOSS_EXTRUDE6_DEPTH)

    # Chamfer4
    chamfer4_edges = [part.edges().sort_by_distance(p)[0] for p in [
        (51.464604833, 155.575, 14.761394806),
        (31.508559167, 155.575, 14.761394806),
    ]]
    chamfer(chamfer4_edges, length=CHAMFER4_SIZE - 0.0001)  # a hair under: the kernel refuses the full size

    # Fillet5
    fillet5_edges = [part.edges().sort_by_distance(p)[0] for p in [
        (111.76, 48.26, 30.48),
    ]]
    fillet(fillet5_edges, radius=FILLET5_R)

    # Sketch19 → Cut-Extrude12 (cut)
    with BuildSketch(Plane.XY.offset(30.48)):
        Polygon((81.28, 52.07), (111.76, 52.07), (111.76, 57.15), (81.28, 57.15), (69.85, 57.15), (69.85, 52.07), align=None)
    extrude(amount=-CUT_EXTRUDE12_DEPTH, mode=Mode.SUBTRACT)

    # Sketch20 → Cut-Extrude13 (cut, through all)
    with BuildSketch(Plane.ZY.offset(-63.5)):
        with Locations((19.05, 39.37)):
            Rectangle(SKETCH20_W, SKETCH20_H)
    extrude(amount=-CUT_EXTRUDE13_DEPTH, mode=Mode.SUBTRACT)

    # Fillet6
    fillet6_edges = [part.edges().sort_by_distance(p)[0] for p in [
        (63.5, 38.1, 19.05),
    ]]
    fillet(fillet6_edges, radius=FILLET6_R)

    # Sketch21 → Cut-Extrude14 (cut, two sides: drawn at the far end of the back side and taken through both)
    with BuildSketch(Plane.XY.offset(17.78).offset(-CUT_EXTRUDE14_DEPTH_BACK)):
        Polygon((12.7, 109.855), (10.485930724, 130.175), (15.565930724, 130.175), (17.78, 109.855), align=None)
        Polygon((55.429725371, 142.875), (50.86041281, 121.653709764), (50.86041281, 109.855), (52.449738918, 109.855), (52.449738918, 121.653709764), (57.019051479, 142.875), align=None)
        with Locations((41.486582, 126.365)):
            Rectangle(SKETCH21_W, SKETCH21_H)
        with Locations((69.426582, 114.87539559)):
            Rectangle(SKETCH21_W, SKETCH21_H_2)
        with Locations((98.636582, 114.900603545)):
            Rectangle(SKETCH21_W, SKETCH21_H_3)
        with Locations((110.49, 102.445426643)):
            Rectangle(SKETCH21_W_2, SKETCH21_H_4)
        with Locations((84.636338767, 126.365)):
            Rectangle(SKETCH21_W_3, SKETCH21_H)
    extrude(amount=CUT_EXTRUDE14_DEPTH + CUT_EXTRUDE14_DEPTH_BACK, mode=Mode.SUBTRACT)

    # Fillet7
    fillet7_edges = [part.edges().sort_by_distance(p)[0] for p in [
        (63.5, 94.615, 17.78),
    ]]
    fillet(fillet7_edges, radius=FILLET7_R)

    # Sketch22 → Cut-Extrude15 (cut)
    with BuildSketch(Plane(origin=(0, 12.7, 0), x_dir=(1, 0, 0), z_dir=(0, 1, 0))):
        with Locations(Location((43.18, -11.908276952, 0), (0, 0, 180))):
            Circle(SKETCH22_R)
        with Locations(Location((48.26, -11.908276952, 0), (0, 0, 180))):
            Circle(SKETCH22_R)
        with Locations(Location((53.34, -11.908276952, 0), (0, 0, 180))):
            Circle(SKETCH22_R)
        with Locations(Location((58.42, -11.908276952, 0), (0, 0, 180))):
            Circle(SKETCH22_R)
        with Locations(Location((43.18, -22.068276952, 0), (0, 0, 180))):
            Circle(SKETCH22_R)
        with Locations(Location((48.26, -22.068276952, 0), (0, 0, 180))):
            Circle(SKETCH22_R)
        with Locations(Location((53.34, -22.068276952, 0), (0, 0, 180))):
            Circle(SKETCH22_R)
        with Locations(Location((58.42, -22.068276952, 0), (0, 0, 180))):
            Circle(SKETCH22_R)
    extrude(amount=-CUT_EXTRUDE15_DEPTH, mode=Mode.SUBTRACT)

    # Sketch23 → Cut-Extrude16 (cut, two sides: drawn at the far end of the back side and taken through both)
    with BuildSketch(Plane(origin=(0, 0, 0), x_dir=(-1, 0, 0), z_dir=(0, 0, -1)).offset(-CUT_EXTRUDE16_DEPTH_BACK)):
        with Locations((-25.4, 120.65)):
            Circle(SKETCH23_R)
        with Locations((-19.05, 25.4)):
            Circle(SKETCH23_R)
        with Locations((-82.55, 6.35)):
            Circle(SKETCH23_R)
    extrude(amount=CUT_EXTRUDE16_DEPTH + CUT_EXTRUDE16_DEPTH_BACK, mode=Mode.SUBTRACT)

    # Sketch24 → Boss-Extrude7 (add)
    with BuildSketch(Plane.XZ):
        with Locations((31.75, 15.24)):
            Rectangle(SKETCH24_W, SKETCH24_H)
        with Locations((72.695229231, 15.24)):
            Rectangle(SKETCH24_W, SKETCH24_H)
    extrude(amount=BOSS_EXTRUDE7_DEPTH)

    # Sketch25 → Cut-Extrude17 (cut, through all)
    with BuildSketch(Plane(origin=(79.045229231, 0, 0), x_dir=(0, 0, -1), z_dir=(1, 0, 0))):
        with Locations((-15.24, -12.7)):
            Circle(SKETCH25_R)
    extrude(amount=-CUT_EXTRUDE17_DEPTH, mode=Mode.SUBTRACT)

    # Sketch27 → Cut-Extrude18 (cut, two sides: drawn at the far end of the back side and taken through both)
    with BuildSketch(Plane(origin=(0, 0, 0), x_dir=(1, 0, 0), z_dir=(0, 1, 0)).offset(-CUT_EXTRUDE18_DEPTH_BACK)):
        with Locations((68.63275208, 14.348076665)):
            Rectangle(SKETCH27_W, SKETCH27_H)
    extrude(amount=CUT_EXTRUDE18_DEPTH + CUT_EXTRUDE18_DEPTH_BACK, mode=Mode.SUBTRACT)

    # Sketch28 → Boss-Extrude8 (add)
    with BuildSketch(Plane.XZ.offset(-104.14)):
        with Locations(Location((6.35, 12.7, 0), (0, 0, 90))):
            Circle(SKETCH28_R)
        with Locations(Location((110.49, 12.7, 0), (0, 0, 90))):
            Circle(SKETCH28_R)
    extrude(amount=BOSS_EXTRUDE8_DEPTH)


solid = part.part
